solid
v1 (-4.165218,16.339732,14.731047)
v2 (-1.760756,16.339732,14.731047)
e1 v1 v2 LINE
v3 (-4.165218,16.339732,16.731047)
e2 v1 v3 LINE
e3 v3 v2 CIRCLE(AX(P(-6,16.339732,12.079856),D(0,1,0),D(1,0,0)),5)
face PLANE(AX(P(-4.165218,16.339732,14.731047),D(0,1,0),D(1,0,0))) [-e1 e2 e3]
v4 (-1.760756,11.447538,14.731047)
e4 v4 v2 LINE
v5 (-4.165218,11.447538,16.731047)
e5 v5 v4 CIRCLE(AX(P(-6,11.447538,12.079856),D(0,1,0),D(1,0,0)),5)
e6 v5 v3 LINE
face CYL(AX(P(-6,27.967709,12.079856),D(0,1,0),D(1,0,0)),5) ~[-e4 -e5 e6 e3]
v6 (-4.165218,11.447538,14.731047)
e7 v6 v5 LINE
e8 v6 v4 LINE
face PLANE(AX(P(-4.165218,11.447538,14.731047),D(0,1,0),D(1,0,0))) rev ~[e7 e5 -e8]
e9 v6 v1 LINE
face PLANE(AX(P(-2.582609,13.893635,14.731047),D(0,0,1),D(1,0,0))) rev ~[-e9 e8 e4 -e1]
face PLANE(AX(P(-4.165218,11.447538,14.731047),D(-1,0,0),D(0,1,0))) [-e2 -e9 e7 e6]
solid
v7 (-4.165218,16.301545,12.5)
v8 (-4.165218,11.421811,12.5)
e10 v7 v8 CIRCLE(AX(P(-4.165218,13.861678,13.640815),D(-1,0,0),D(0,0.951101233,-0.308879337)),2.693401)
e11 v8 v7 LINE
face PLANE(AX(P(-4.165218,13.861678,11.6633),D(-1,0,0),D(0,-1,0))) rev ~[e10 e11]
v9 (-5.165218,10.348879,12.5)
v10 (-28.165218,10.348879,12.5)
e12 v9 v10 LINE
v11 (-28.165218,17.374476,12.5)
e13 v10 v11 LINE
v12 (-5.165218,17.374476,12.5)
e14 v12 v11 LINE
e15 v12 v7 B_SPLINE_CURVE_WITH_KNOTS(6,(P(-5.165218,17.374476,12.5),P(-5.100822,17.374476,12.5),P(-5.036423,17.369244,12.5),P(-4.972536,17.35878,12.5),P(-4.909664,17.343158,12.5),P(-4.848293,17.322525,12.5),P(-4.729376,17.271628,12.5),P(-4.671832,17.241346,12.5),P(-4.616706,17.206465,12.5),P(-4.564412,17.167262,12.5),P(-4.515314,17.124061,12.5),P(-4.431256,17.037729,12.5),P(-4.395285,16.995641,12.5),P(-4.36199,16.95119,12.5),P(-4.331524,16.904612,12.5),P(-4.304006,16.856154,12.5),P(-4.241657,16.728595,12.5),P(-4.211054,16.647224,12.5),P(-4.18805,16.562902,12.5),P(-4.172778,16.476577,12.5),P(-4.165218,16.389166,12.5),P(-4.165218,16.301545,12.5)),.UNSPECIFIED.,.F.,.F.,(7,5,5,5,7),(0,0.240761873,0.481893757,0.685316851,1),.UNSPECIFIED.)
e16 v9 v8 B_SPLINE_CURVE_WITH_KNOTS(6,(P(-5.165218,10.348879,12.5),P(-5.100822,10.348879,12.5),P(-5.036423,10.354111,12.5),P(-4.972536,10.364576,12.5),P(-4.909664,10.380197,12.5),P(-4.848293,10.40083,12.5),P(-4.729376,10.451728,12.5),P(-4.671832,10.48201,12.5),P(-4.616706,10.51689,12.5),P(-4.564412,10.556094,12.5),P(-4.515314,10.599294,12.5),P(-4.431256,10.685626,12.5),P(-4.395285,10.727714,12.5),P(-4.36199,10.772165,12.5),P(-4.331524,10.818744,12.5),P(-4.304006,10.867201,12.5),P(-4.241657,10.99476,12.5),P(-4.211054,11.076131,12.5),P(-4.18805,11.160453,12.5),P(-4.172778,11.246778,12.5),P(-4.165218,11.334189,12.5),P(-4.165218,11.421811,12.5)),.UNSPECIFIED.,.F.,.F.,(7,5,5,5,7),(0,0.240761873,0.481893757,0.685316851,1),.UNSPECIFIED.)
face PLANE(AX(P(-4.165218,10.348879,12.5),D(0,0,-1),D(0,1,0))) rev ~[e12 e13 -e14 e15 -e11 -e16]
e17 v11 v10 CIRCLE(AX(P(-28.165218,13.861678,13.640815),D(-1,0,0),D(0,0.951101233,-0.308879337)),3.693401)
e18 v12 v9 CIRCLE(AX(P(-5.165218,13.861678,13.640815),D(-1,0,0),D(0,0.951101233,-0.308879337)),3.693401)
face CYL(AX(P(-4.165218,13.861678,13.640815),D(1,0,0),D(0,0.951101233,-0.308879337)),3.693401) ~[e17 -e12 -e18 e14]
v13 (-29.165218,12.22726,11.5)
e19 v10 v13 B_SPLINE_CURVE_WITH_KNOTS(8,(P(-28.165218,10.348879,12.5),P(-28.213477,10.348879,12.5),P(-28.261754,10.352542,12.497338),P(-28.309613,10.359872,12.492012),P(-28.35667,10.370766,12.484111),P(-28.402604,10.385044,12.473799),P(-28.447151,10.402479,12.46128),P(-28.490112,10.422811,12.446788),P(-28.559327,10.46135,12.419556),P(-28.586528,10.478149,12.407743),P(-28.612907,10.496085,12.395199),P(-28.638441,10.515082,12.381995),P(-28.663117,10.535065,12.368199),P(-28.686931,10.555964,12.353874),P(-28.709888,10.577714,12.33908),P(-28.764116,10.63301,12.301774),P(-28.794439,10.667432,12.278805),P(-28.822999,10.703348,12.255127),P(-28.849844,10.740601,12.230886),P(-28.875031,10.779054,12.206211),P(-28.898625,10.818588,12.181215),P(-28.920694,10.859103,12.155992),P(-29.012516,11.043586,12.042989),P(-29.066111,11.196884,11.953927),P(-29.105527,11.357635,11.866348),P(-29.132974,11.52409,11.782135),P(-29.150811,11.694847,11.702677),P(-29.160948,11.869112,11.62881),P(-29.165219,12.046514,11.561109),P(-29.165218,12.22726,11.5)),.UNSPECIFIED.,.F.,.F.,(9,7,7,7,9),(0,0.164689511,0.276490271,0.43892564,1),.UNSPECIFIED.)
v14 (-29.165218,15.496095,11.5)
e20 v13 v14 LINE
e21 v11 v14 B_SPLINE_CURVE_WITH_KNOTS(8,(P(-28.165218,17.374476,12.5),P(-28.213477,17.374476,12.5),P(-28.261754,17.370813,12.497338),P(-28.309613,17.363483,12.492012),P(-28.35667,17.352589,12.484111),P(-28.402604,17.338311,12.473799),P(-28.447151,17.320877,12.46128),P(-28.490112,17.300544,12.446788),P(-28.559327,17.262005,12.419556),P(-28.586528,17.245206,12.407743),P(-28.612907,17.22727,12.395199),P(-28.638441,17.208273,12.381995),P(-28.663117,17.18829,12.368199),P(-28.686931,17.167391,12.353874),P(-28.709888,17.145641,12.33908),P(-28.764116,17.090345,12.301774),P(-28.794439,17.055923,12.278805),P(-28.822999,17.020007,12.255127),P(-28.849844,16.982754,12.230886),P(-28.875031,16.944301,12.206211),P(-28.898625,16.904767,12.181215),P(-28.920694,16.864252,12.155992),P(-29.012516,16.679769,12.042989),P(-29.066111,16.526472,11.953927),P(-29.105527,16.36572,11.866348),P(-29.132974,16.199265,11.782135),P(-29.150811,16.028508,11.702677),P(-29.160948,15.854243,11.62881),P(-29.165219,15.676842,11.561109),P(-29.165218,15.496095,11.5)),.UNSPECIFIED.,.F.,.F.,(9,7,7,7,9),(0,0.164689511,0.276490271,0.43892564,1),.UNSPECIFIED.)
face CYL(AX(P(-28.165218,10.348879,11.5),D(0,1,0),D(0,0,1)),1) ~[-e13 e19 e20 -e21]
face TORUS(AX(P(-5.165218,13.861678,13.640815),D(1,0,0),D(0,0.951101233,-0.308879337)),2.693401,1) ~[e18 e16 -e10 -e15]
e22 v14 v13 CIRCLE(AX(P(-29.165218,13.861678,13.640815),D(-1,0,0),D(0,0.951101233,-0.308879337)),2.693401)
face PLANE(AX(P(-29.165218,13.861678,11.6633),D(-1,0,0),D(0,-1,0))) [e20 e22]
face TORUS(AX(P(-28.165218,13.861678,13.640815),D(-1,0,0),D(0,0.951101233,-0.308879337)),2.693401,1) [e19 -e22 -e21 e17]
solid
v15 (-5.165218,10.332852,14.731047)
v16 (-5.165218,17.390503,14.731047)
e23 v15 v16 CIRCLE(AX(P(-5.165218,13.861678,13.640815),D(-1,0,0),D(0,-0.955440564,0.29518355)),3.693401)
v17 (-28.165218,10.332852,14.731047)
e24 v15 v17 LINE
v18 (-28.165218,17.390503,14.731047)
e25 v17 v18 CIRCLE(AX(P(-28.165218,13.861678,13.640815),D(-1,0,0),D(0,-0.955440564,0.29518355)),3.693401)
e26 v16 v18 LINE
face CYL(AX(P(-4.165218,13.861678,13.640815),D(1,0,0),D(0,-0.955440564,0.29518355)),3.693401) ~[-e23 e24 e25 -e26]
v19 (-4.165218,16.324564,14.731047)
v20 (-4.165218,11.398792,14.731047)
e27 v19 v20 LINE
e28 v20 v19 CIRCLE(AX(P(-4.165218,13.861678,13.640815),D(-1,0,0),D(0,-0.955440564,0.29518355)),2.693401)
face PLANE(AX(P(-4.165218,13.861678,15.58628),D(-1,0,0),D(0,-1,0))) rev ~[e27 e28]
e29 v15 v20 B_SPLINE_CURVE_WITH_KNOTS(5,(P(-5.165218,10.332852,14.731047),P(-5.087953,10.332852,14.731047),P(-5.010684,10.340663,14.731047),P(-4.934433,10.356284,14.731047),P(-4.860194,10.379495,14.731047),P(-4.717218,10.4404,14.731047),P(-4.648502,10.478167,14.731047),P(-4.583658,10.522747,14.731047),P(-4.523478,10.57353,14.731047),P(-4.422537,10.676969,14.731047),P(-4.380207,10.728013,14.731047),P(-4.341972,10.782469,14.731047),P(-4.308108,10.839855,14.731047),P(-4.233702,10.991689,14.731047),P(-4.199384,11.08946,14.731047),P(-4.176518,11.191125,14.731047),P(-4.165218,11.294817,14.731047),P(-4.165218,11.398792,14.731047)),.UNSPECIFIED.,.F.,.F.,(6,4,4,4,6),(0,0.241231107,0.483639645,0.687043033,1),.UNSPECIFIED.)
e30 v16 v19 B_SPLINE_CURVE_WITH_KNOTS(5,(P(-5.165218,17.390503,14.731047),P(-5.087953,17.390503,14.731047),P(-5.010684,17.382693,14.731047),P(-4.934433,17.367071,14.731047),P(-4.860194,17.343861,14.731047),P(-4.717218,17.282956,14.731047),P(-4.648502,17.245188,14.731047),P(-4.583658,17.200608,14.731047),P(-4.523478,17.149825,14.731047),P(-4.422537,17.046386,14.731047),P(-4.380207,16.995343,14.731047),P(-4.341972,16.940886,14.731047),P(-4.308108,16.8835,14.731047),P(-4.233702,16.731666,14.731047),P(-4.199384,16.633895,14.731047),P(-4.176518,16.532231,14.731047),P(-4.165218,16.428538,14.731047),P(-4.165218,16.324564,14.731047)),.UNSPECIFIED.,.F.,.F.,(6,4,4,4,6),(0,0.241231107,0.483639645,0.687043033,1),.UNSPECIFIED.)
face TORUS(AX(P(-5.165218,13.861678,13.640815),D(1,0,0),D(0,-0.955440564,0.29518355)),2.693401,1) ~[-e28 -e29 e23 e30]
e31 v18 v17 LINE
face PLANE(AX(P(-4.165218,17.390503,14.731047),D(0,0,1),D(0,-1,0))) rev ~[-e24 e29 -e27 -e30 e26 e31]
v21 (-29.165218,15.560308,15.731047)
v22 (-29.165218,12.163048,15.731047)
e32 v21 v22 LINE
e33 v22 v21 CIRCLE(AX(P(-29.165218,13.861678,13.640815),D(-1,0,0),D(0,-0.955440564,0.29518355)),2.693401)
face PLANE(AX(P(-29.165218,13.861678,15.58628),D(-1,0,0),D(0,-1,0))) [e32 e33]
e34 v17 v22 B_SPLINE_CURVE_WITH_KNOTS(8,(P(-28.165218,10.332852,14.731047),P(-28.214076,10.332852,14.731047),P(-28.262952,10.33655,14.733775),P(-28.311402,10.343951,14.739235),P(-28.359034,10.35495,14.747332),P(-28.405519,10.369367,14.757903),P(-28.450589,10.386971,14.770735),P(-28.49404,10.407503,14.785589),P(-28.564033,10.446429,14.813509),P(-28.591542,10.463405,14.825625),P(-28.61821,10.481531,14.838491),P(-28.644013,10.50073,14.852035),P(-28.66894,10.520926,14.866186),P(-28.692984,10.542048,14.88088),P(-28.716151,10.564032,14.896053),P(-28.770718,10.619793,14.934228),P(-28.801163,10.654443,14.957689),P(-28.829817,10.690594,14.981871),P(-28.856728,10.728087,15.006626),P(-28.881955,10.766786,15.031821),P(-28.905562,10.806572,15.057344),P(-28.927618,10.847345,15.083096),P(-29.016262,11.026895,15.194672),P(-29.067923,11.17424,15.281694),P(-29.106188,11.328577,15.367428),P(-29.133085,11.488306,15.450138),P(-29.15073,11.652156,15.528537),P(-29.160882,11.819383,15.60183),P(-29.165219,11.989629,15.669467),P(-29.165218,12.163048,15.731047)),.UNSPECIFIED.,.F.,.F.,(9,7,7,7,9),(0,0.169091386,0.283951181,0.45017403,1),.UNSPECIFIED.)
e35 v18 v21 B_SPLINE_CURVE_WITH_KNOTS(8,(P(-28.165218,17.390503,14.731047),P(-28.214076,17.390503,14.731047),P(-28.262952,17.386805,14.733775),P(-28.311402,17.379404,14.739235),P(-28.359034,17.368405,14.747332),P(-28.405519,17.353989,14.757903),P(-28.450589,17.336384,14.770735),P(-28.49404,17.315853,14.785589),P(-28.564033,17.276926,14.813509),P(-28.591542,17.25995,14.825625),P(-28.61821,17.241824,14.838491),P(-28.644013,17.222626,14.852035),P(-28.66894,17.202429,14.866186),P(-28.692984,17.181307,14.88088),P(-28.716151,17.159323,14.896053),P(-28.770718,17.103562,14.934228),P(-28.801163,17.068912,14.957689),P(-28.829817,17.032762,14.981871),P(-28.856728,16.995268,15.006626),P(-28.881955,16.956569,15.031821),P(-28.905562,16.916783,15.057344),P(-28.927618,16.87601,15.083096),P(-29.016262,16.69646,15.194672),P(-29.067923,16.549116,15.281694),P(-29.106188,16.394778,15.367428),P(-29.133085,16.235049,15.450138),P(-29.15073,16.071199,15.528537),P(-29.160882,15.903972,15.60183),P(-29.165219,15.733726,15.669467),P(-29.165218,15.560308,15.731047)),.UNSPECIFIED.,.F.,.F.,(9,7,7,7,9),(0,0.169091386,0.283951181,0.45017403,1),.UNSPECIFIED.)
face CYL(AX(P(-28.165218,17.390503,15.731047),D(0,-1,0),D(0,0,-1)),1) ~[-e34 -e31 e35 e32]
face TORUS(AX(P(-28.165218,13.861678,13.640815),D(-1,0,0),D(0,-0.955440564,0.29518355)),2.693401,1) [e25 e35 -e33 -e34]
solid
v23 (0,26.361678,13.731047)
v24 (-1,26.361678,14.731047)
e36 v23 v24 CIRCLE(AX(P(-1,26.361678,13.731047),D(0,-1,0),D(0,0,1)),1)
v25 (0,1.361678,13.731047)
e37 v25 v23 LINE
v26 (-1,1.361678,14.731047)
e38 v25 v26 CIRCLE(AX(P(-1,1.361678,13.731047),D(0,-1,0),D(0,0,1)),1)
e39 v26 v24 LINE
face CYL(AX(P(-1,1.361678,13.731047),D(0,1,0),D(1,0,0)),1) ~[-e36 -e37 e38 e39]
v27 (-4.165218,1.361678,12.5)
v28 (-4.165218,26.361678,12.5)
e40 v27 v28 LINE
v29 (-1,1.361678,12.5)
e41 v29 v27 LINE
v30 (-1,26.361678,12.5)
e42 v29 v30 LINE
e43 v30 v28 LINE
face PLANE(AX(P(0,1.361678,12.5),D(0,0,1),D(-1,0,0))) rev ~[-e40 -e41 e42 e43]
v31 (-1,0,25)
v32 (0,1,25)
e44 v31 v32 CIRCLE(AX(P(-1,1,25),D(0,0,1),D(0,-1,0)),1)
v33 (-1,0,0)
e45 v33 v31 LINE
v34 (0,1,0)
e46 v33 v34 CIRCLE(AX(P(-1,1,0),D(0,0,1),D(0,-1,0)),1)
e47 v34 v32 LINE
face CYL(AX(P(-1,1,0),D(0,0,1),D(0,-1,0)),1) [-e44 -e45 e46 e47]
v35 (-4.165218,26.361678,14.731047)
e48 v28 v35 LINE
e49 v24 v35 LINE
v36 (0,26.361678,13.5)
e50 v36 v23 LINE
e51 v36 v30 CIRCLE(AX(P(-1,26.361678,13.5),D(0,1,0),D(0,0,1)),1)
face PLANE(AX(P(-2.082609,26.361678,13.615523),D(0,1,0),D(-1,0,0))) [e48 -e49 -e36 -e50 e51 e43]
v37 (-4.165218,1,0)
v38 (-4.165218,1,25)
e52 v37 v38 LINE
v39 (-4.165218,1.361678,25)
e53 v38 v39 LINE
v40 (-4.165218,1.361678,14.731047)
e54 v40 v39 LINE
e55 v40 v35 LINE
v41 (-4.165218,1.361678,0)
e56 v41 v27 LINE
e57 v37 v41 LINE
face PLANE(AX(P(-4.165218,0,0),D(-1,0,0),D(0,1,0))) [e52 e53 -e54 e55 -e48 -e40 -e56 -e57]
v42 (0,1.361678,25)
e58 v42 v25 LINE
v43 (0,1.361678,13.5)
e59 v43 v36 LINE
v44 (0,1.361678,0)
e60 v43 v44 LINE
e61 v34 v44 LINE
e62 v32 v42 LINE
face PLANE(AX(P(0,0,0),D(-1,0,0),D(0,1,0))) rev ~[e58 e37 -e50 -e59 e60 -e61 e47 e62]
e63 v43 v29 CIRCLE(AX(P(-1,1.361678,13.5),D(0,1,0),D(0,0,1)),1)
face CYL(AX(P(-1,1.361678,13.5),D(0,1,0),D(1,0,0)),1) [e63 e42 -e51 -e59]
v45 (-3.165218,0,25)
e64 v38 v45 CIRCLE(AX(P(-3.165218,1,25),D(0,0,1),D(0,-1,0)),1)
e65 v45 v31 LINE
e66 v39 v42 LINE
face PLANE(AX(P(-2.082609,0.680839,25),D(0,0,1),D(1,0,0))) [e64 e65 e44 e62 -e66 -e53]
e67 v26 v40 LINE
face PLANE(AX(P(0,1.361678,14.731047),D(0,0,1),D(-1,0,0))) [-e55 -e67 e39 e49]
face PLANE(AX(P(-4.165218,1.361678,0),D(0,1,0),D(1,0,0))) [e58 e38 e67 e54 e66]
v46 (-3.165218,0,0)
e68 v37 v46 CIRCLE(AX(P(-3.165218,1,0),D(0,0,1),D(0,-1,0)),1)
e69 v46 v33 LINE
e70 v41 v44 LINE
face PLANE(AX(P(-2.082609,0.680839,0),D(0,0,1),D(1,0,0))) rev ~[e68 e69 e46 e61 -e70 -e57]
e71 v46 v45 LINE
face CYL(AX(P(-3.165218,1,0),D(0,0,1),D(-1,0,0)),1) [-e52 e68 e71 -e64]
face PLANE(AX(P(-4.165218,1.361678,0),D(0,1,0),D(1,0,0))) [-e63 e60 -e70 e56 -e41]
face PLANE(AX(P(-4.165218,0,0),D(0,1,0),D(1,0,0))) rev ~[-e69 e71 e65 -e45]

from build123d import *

# Parameters (mm, degrees)
F0_W        = 4.1652182117
F0_H        = 1.361677656
F1_DEPTH    = 25
F2_W        = 4.1652182117
F2_H        = 2.2310467437
F3_DEPTH    = 25
F5_DEPTH    = 25
F6_R        = 1
F6_2_R      = 1
F6_3_R      = 1
F7_W        = 3.1652182117
F7_H        = 4.8921946436
F8_DEPTH    = 2
F9_T1_DEPTH = 28.1481486067


# Not quite as in the source:
# - a fillet or chamfer that OpenCascade refuses, or shapes differently, is made with other operations: its cross-section is extruded or revolved along the edge and cut away or added


with BuildPart() as f1:
    # F0 (on Top) → F1 (new body)
    with BuildSketch(Plane.XY):
        with Locations((-2.0826091059, 0.680838828)):
            Rectangle(F0_W, F0_H)
    extrude(amount=F1_DEPTH)

    # F2 (on face) → F3 (join)
    with BuildSketch(Plane(origin=(0, 1.361677656, 0), x_dir=(-1, 0, 0), z_dir=(0, 1, 0))):
        with Locations((2.0826091059, 13.6155233718)):
            Rectangle(F2_W, F2_H)
    extrude(amount=F3_DEPTH)

    # F6
    f6_edges = [f1.edges().sort_by_distance(p)[0] for p in [
        (-4.165218, 0, 12.5),
        (0, 0, 12.5),
        (0, 13.861678, 14.731047),
        (0, 13.861678, 12.5),
    ]]
    fillet(f6_edges, radius=F6_R)


with BuildPart() as f5:
    # F4 (on face) → F5 (new body)
    with BuildSketch(Plane(origin=(-4.1652182117, 0, 0), x_dir=(0, -1, 0), z_dir=(-1, 0, 0))):
        with BuildLine():
            Line((-17.3905032205, 14.7310467437), (-10.3328520914, 14.7310467437))
            ThreePointArc((-10.3328520914, 14.7310467437), (-13.861677656, 17.3342168413), (-17.3905032205, 14.7310467437))
        make_face()
    extrude(amount=F5_DEPTH)

    # F6#2
    f6_2_edges = [f5.edges().sort_by_distance(p)[0] for p in [
        (-4.165218, 13.861678, 17.334217),
        (-29.165218, 13.861678, 14.731047),
        (-29.165218, 13.861678, 17.334217),
    ]]
    fillet(f6_2_edges, radius=F6_2_R)


with BuildPart() as f5b:
    # F4 (on face) → F5, piece 2 (new body)
    with BuildSketch(Plane(origin=(-4.1652182117, 0, 0), x_dir=(0, -1, 0), z_dir=(-1, 0, 0))):
        with BuildLine():
            ThreePointArc((-17.3744763274, 12.5), (-13.861677656, 9.947413943), (-10.3488789845, 12.5))
            Line((-10.3488789845, 12.5), (-17.3744763274, 12.5))
        make_face()
    extrude(amount=F5_DEPTH)

    # F6#3
    f6_3_edges = [f5b.edges().sort_by_distance(p)[0] for p in [
        (-4.165218, 13.861678, 9.947414),
        (-29.165218, 13.861678, 9.947414),
        (-29.165218, 13.861678, 12.5),
    ]]
    fillet(f6_3_edges, radius=F6_3_R)


with BuildPart() as f8:
    # F7 (on face) → F8 (new body)
    with BuildSketch(Plane.XY.offset(14.7310467437)):
        with Locations((-2.5826091059, 13.8936350122)):
            Rectangle(F7_W, F7_H)
    extrude(amount=F8_DEPTH)

    # F9: fillet of radius 5 on 1 edges, made by hand

    # F9_s2 → F9_t1 (cut)
    with BuildSketch(Plane.XZ.offset(-27.9677093156)):
        with BuildLine():
            ThreePointArc((-1, 12.0798559511), (-1.8663630456, 14.8928695538), (-4.1652182117, 16.7310467437))
            Line((-4.1652182117, 16.7310467437), (-4.1285225759, 16.8240705595))
            ThreePointArc((-4.1285225759, 16.8240705595), (-2.5826091059, 16.8310467437), (-1, 16.8310467437))
            Line((-1, 16.8310467437), (-0.9, 16.7310467437))
            Line((-0.9, 16.7310467437), (-0.9, 12.0798559511))
            Line((-0.9, 12.0798559511), (-1, 12.0798559511))
        make_face()
    extrude(amount=F9_T1_DEPTH, mode=Mode.SUBTRACT)


solid = Compound([f1.part, f5.part, f5b.part, f8.part])
